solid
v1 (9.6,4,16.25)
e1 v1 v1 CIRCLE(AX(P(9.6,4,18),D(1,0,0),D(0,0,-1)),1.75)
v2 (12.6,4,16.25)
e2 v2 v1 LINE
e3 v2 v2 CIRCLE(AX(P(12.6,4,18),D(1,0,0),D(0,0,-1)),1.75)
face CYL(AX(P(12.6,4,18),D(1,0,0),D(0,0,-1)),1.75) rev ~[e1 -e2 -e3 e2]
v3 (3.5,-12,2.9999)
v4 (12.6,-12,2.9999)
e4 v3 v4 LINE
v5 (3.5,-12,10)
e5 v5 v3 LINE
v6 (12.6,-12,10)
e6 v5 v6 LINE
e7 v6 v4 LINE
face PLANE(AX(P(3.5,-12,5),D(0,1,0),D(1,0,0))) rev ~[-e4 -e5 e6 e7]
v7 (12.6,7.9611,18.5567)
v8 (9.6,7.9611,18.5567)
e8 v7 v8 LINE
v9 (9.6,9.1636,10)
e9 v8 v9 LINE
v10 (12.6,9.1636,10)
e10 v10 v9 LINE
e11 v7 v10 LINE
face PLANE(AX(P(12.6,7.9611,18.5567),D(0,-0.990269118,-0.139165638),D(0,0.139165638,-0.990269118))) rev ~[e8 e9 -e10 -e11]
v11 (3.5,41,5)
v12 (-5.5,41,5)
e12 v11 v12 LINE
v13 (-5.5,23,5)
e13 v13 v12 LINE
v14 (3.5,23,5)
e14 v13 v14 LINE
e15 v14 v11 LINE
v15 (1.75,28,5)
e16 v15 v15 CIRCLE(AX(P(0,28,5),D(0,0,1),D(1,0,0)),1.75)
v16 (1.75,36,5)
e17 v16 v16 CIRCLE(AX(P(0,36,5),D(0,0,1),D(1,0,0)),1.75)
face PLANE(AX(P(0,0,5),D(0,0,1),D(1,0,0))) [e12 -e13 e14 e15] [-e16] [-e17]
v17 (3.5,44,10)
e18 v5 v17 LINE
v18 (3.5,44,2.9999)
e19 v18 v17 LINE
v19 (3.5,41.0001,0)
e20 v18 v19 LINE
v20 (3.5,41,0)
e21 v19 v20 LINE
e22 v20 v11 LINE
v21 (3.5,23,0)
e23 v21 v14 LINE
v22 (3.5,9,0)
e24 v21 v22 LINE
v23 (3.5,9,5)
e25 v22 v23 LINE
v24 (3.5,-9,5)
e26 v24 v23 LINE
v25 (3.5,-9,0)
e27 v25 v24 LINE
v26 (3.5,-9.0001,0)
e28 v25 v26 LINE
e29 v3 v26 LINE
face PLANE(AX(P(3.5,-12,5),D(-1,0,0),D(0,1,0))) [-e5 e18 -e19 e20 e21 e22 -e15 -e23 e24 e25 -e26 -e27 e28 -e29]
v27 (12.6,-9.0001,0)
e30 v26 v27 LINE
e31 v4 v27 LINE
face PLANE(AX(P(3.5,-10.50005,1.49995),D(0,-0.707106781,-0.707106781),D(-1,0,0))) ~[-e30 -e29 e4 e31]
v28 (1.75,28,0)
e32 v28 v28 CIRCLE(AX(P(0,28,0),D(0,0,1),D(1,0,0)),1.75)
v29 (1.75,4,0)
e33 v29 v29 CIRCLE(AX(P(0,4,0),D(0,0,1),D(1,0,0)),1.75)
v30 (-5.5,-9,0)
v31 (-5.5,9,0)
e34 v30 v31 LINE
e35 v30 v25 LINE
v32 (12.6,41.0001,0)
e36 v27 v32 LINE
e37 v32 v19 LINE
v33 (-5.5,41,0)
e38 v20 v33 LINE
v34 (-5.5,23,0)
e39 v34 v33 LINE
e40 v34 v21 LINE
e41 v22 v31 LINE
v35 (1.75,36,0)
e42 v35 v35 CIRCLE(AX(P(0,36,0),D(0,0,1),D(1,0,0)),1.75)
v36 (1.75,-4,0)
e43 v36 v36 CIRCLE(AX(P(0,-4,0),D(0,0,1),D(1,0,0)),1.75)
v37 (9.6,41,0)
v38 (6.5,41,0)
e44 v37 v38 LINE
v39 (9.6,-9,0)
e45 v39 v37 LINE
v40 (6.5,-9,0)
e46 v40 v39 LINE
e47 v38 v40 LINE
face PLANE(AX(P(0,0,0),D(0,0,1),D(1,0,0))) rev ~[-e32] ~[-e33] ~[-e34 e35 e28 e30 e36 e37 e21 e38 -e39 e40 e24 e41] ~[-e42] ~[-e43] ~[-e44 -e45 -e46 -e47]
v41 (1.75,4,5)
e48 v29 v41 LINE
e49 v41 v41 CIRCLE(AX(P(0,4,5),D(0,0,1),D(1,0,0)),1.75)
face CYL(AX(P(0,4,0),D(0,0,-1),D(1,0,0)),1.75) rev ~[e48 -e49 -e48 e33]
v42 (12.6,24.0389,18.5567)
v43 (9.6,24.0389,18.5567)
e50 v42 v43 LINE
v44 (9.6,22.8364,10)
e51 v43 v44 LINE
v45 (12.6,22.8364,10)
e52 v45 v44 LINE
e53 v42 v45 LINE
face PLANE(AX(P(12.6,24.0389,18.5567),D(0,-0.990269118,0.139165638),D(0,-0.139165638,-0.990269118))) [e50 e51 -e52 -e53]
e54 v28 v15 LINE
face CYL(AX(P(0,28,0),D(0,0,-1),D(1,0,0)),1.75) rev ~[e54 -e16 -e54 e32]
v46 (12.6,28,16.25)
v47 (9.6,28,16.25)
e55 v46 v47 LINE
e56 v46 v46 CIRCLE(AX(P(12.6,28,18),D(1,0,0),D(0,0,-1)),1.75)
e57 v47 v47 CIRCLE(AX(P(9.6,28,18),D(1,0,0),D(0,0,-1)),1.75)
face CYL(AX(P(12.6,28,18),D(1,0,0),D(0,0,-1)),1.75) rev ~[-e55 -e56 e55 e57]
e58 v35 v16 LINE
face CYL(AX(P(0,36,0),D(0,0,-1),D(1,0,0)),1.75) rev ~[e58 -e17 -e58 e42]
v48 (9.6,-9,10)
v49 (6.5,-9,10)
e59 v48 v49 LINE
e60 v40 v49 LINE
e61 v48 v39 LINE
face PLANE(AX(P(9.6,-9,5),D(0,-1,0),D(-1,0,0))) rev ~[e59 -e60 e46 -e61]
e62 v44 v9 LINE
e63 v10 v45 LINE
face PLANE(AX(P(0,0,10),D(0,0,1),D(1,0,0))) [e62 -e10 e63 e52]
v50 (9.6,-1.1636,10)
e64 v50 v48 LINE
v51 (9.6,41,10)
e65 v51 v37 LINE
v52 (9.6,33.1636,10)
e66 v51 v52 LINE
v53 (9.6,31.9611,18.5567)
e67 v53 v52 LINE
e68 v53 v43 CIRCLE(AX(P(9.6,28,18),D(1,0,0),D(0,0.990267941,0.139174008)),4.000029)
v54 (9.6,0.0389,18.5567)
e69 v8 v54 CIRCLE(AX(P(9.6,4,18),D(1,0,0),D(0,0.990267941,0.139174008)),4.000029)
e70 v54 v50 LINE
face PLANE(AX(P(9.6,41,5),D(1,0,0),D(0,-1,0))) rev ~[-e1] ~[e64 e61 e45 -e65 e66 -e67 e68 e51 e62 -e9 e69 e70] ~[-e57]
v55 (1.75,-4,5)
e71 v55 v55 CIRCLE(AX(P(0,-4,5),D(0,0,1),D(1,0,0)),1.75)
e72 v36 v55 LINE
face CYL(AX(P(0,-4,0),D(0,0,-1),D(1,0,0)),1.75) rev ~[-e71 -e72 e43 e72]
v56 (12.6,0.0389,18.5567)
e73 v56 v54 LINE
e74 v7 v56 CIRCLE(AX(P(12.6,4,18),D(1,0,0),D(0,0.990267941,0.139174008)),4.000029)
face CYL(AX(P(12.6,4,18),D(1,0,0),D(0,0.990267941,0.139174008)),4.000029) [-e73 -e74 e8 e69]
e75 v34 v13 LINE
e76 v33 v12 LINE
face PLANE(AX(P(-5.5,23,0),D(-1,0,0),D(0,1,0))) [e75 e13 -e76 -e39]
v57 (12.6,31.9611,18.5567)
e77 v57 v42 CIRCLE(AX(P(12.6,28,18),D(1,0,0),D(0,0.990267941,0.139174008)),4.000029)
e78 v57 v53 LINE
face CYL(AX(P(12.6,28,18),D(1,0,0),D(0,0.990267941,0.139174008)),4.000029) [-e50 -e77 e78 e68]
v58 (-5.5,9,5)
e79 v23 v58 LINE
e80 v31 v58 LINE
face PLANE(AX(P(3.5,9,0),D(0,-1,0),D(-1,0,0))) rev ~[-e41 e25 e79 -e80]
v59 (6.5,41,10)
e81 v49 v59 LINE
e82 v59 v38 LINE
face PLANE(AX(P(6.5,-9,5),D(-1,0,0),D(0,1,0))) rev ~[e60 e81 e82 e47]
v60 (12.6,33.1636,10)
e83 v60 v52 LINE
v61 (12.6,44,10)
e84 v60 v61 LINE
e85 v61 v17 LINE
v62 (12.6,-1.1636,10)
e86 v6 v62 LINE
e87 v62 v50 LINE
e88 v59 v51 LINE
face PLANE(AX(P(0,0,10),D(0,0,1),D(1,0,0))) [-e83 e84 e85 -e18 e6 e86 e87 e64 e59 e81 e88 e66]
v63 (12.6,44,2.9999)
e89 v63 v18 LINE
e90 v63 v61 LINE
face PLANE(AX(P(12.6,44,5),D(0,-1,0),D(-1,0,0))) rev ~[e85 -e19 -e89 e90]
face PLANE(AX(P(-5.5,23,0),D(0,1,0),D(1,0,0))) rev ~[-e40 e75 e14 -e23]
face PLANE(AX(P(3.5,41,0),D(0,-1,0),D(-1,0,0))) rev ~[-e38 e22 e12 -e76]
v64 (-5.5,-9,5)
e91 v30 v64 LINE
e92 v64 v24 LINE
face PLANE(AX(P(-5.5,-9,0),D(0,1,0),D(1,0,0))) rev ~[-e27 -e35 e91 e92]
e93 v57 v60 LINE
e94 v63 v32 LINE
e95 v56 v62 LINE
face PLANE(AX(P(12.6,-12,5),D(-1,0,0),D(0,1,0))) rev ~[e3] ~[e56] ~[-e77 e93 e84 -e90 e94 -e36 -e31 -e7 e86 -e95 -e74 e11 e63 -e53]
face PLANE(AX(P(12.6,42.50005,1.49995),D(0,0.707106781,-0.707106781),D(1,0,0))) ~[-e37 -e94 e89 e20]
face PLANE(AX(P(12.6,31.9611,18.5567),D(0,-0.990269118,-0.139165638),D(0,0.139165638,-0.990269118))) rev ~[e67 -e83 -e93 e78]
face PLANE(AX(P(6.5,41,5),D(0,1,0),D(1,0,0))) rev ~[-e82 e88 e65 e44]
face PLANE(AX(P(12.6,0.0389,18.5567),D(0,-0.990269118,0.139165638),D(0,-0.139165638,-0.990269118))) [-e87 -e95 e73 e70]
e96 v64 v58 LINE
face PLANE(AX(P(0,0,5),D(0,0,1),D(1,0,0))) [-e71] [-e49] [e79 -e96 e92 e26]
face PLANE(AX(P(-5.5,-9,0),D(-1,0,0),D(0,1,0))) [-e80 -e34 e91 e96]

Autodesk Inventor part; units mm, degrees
ref_plane "YZ Plane" through (0, 0, 0) normal (1, 0, 0) x (0, 1, 0)
ref_plane "XZ Plane" through (0, 0, 0) normal (0, 1, 0) x (-1, 0, 0)
ref_plane "XY Plane" through (0, 0, 0) normal (0, 0, 1) x (1, 0, 0)
sketch "Sketch1" plane through (0, 0, 0) normal (0, 0, 1) x (1, 0, 0)
  arc A0 (5.5, 7) -> (3.5, 9) centre (3.5, 7) ccw projected
  line L0 (3.5, 9) -> (-5.5, 9) projected
  line L1 (-5.5, -9) -> (-5.5, 9) projected
  line L2 (-5.5, -9) -> (3.5, -9) projected
  arc A1 (3.5, -9) -> (5.5, -7) centre (3.5, -7) ccw projected
  line L3 (5.5, -7) -> (5.5, 7) projected
  circle A2 centre (0, 4) radius 2.25 construction
  circle A3 centre (0, -4) radius 2.25 construction
  arc A4 (5.5, 39) -> (3.5, 41) centre (3.5, 39) ccw projected
  line L4 (3.5, 41) -> (-5.5, 41) projected
  line L5 (-5.5, 23) -> (-5.5, 41) projected
  line L6 (-5.5, 23) -> (3.5, 23) projected
  arc A5 (3.5, 23) -> (5.5, 25) centre (3.5, 25) ccw projected
  line L7 (5.5, 25) -> (5.5, 39) projected
  circle A6 centre (0, 36) radius 2.25 construction
  circle A7 centre (0, 28) radius 2.25 construction
  circle A8 centre (0, 4) radius 1.75
  circle A9 centre (0, -4) radius 1.75
  circle A10 centre (0, 28) radius 1.75
  circle A11 centre (0, 36) radius 1.75
  line L8 (6.4713, 13.5) -> (-5.5, 13.5) construction
  line L9 (-5.5, 18.5) -> (6.4713, 18.5) construction
  line L10 (6.5, -9) -> (9.6, -9)
  line L11 (9.6, -9) -> (9.6, 41)
  line L12 (9.6, 41) -> (6.5, 41)
  line L13 (6.5, 41) -> (6.5, -9)
  line L14 (-1, 9) -> (-1, 23) construction
  line L15 (-1, 16) -> (6.5, 16) construction
  line L16 (3.5, -12) -> (12.6, -12)
  line L17 (12.6, -12) -> (12.6, 44)
  line L18 (12.6, 44) -> (3.5, 44)
  line L19 (3.5, 44) -> (3.5, -12)
  point P0 (0, 0)
  dimension "d0" = 3.5
  dimension "d1" = 3.5
  dimension "d2" = 3.5
  dimension "d3" = 3.5
  dimension "d4" = 3.1
  dimension "d5" = 50
  dimension "d7" = 3
extrude "Extrusion1" add sketch "Sketch1" along normal blind 5
sketch "Sketch2" plane through (0, 0, 5) normal (0, 0, 1) x (1, 0, 0)
  line L0 (12.6, 44) -> (3.5, 44) projected
  line L1 (3.5, -12) -> (12.6, -12) projected
  line L2 (12.6, -12) -> (12.6, 44) projected
  line L3 (12.6, -12) -> (3.5, -12)
  line L4 (3.5, -12) -> (3.5, 44)
  line L5 (3.5, 44) -> (12.6, 44)
  line L6 (12.6, 44) -> (12.6, -12)
  line L7 (6.5, -9) -> (6.5, 41) projected
  line L8 (9.6, -9) -> (6.5, -9) projected
  line L9 (6.5, 41) -> (9.6, 41)
  line L10 (9.6, 41) -> (9.6, -9)
  line L11 (9.6, -9) -> (6.5, -9)
  line L12 (6.5, -9) -> (6.5, 41)
  point P0 (0, 0)
extrude "Extrusion2" add sketch "Sketch2" along normal blind 5
sketch "Sketch3" plane through (12.6, -12, 0) normal (1, 0, 0) x (0, 0, -1)
  circle A0 centre (-18, 40) radius 1.75
  arc A1 (-18.5567, 43.9611) -> (-18.5567, 36.0389) centre (-18, 40) ccw
  line L0 (-18.5567, 36.0389) -> (-10, 34.8364)
  line L1 (-10, 0) -> (-10, 56) projected
  line L2 (-18.5567, 43.9611) -> (-10, 45.1636)
  line L3 (-18, 40) -> (-10, 40) construction
  line L4 (-33.1913, 28) -> (0, 28)
  line L5 (0, 0) -> (0, 56) projected
  circle A2 centre (-18, 16) radius 1.75
  arc A3 (-18.5567, 19.9611) -> (-18.5567, 12.0389) centre (-18, 16) ccw
  line L6 (-18.5567, 19.9611) -> (-10, 21.1636)
  line L7 (-18.5567, 12.0389) -> (-10, 10.8364)
  line L8 (-18, 16) -> (-10, 16) construction
  point P0 (0, 12)
  point P1 (-14, 40)
  point P2 (-10, 28)
  point P3 (-10, 28)
  point P4 (-14, 16)
  dimension "d12" = 3.5
  dimension "d13" = 8
  dimension "d14" = 8
  dimension "d15" = 4
  dimension "d16" = 8
  dimension "d17" = 12
extrude "Extrusion3" add sketch "Sketch3" against normal up to surface (3 mm away)
sketch "Sketch4" plane through (0, 0, 5) normal (0, 0, 1) x (1, 0, 0)
  point P0 (0, 0)
chamfer "Chamfer1" distance 3 angle 45 2 edges at (8.05, 44, 0) (8.05, -12, 0)
properties part number "Lysekrone_adapter"
